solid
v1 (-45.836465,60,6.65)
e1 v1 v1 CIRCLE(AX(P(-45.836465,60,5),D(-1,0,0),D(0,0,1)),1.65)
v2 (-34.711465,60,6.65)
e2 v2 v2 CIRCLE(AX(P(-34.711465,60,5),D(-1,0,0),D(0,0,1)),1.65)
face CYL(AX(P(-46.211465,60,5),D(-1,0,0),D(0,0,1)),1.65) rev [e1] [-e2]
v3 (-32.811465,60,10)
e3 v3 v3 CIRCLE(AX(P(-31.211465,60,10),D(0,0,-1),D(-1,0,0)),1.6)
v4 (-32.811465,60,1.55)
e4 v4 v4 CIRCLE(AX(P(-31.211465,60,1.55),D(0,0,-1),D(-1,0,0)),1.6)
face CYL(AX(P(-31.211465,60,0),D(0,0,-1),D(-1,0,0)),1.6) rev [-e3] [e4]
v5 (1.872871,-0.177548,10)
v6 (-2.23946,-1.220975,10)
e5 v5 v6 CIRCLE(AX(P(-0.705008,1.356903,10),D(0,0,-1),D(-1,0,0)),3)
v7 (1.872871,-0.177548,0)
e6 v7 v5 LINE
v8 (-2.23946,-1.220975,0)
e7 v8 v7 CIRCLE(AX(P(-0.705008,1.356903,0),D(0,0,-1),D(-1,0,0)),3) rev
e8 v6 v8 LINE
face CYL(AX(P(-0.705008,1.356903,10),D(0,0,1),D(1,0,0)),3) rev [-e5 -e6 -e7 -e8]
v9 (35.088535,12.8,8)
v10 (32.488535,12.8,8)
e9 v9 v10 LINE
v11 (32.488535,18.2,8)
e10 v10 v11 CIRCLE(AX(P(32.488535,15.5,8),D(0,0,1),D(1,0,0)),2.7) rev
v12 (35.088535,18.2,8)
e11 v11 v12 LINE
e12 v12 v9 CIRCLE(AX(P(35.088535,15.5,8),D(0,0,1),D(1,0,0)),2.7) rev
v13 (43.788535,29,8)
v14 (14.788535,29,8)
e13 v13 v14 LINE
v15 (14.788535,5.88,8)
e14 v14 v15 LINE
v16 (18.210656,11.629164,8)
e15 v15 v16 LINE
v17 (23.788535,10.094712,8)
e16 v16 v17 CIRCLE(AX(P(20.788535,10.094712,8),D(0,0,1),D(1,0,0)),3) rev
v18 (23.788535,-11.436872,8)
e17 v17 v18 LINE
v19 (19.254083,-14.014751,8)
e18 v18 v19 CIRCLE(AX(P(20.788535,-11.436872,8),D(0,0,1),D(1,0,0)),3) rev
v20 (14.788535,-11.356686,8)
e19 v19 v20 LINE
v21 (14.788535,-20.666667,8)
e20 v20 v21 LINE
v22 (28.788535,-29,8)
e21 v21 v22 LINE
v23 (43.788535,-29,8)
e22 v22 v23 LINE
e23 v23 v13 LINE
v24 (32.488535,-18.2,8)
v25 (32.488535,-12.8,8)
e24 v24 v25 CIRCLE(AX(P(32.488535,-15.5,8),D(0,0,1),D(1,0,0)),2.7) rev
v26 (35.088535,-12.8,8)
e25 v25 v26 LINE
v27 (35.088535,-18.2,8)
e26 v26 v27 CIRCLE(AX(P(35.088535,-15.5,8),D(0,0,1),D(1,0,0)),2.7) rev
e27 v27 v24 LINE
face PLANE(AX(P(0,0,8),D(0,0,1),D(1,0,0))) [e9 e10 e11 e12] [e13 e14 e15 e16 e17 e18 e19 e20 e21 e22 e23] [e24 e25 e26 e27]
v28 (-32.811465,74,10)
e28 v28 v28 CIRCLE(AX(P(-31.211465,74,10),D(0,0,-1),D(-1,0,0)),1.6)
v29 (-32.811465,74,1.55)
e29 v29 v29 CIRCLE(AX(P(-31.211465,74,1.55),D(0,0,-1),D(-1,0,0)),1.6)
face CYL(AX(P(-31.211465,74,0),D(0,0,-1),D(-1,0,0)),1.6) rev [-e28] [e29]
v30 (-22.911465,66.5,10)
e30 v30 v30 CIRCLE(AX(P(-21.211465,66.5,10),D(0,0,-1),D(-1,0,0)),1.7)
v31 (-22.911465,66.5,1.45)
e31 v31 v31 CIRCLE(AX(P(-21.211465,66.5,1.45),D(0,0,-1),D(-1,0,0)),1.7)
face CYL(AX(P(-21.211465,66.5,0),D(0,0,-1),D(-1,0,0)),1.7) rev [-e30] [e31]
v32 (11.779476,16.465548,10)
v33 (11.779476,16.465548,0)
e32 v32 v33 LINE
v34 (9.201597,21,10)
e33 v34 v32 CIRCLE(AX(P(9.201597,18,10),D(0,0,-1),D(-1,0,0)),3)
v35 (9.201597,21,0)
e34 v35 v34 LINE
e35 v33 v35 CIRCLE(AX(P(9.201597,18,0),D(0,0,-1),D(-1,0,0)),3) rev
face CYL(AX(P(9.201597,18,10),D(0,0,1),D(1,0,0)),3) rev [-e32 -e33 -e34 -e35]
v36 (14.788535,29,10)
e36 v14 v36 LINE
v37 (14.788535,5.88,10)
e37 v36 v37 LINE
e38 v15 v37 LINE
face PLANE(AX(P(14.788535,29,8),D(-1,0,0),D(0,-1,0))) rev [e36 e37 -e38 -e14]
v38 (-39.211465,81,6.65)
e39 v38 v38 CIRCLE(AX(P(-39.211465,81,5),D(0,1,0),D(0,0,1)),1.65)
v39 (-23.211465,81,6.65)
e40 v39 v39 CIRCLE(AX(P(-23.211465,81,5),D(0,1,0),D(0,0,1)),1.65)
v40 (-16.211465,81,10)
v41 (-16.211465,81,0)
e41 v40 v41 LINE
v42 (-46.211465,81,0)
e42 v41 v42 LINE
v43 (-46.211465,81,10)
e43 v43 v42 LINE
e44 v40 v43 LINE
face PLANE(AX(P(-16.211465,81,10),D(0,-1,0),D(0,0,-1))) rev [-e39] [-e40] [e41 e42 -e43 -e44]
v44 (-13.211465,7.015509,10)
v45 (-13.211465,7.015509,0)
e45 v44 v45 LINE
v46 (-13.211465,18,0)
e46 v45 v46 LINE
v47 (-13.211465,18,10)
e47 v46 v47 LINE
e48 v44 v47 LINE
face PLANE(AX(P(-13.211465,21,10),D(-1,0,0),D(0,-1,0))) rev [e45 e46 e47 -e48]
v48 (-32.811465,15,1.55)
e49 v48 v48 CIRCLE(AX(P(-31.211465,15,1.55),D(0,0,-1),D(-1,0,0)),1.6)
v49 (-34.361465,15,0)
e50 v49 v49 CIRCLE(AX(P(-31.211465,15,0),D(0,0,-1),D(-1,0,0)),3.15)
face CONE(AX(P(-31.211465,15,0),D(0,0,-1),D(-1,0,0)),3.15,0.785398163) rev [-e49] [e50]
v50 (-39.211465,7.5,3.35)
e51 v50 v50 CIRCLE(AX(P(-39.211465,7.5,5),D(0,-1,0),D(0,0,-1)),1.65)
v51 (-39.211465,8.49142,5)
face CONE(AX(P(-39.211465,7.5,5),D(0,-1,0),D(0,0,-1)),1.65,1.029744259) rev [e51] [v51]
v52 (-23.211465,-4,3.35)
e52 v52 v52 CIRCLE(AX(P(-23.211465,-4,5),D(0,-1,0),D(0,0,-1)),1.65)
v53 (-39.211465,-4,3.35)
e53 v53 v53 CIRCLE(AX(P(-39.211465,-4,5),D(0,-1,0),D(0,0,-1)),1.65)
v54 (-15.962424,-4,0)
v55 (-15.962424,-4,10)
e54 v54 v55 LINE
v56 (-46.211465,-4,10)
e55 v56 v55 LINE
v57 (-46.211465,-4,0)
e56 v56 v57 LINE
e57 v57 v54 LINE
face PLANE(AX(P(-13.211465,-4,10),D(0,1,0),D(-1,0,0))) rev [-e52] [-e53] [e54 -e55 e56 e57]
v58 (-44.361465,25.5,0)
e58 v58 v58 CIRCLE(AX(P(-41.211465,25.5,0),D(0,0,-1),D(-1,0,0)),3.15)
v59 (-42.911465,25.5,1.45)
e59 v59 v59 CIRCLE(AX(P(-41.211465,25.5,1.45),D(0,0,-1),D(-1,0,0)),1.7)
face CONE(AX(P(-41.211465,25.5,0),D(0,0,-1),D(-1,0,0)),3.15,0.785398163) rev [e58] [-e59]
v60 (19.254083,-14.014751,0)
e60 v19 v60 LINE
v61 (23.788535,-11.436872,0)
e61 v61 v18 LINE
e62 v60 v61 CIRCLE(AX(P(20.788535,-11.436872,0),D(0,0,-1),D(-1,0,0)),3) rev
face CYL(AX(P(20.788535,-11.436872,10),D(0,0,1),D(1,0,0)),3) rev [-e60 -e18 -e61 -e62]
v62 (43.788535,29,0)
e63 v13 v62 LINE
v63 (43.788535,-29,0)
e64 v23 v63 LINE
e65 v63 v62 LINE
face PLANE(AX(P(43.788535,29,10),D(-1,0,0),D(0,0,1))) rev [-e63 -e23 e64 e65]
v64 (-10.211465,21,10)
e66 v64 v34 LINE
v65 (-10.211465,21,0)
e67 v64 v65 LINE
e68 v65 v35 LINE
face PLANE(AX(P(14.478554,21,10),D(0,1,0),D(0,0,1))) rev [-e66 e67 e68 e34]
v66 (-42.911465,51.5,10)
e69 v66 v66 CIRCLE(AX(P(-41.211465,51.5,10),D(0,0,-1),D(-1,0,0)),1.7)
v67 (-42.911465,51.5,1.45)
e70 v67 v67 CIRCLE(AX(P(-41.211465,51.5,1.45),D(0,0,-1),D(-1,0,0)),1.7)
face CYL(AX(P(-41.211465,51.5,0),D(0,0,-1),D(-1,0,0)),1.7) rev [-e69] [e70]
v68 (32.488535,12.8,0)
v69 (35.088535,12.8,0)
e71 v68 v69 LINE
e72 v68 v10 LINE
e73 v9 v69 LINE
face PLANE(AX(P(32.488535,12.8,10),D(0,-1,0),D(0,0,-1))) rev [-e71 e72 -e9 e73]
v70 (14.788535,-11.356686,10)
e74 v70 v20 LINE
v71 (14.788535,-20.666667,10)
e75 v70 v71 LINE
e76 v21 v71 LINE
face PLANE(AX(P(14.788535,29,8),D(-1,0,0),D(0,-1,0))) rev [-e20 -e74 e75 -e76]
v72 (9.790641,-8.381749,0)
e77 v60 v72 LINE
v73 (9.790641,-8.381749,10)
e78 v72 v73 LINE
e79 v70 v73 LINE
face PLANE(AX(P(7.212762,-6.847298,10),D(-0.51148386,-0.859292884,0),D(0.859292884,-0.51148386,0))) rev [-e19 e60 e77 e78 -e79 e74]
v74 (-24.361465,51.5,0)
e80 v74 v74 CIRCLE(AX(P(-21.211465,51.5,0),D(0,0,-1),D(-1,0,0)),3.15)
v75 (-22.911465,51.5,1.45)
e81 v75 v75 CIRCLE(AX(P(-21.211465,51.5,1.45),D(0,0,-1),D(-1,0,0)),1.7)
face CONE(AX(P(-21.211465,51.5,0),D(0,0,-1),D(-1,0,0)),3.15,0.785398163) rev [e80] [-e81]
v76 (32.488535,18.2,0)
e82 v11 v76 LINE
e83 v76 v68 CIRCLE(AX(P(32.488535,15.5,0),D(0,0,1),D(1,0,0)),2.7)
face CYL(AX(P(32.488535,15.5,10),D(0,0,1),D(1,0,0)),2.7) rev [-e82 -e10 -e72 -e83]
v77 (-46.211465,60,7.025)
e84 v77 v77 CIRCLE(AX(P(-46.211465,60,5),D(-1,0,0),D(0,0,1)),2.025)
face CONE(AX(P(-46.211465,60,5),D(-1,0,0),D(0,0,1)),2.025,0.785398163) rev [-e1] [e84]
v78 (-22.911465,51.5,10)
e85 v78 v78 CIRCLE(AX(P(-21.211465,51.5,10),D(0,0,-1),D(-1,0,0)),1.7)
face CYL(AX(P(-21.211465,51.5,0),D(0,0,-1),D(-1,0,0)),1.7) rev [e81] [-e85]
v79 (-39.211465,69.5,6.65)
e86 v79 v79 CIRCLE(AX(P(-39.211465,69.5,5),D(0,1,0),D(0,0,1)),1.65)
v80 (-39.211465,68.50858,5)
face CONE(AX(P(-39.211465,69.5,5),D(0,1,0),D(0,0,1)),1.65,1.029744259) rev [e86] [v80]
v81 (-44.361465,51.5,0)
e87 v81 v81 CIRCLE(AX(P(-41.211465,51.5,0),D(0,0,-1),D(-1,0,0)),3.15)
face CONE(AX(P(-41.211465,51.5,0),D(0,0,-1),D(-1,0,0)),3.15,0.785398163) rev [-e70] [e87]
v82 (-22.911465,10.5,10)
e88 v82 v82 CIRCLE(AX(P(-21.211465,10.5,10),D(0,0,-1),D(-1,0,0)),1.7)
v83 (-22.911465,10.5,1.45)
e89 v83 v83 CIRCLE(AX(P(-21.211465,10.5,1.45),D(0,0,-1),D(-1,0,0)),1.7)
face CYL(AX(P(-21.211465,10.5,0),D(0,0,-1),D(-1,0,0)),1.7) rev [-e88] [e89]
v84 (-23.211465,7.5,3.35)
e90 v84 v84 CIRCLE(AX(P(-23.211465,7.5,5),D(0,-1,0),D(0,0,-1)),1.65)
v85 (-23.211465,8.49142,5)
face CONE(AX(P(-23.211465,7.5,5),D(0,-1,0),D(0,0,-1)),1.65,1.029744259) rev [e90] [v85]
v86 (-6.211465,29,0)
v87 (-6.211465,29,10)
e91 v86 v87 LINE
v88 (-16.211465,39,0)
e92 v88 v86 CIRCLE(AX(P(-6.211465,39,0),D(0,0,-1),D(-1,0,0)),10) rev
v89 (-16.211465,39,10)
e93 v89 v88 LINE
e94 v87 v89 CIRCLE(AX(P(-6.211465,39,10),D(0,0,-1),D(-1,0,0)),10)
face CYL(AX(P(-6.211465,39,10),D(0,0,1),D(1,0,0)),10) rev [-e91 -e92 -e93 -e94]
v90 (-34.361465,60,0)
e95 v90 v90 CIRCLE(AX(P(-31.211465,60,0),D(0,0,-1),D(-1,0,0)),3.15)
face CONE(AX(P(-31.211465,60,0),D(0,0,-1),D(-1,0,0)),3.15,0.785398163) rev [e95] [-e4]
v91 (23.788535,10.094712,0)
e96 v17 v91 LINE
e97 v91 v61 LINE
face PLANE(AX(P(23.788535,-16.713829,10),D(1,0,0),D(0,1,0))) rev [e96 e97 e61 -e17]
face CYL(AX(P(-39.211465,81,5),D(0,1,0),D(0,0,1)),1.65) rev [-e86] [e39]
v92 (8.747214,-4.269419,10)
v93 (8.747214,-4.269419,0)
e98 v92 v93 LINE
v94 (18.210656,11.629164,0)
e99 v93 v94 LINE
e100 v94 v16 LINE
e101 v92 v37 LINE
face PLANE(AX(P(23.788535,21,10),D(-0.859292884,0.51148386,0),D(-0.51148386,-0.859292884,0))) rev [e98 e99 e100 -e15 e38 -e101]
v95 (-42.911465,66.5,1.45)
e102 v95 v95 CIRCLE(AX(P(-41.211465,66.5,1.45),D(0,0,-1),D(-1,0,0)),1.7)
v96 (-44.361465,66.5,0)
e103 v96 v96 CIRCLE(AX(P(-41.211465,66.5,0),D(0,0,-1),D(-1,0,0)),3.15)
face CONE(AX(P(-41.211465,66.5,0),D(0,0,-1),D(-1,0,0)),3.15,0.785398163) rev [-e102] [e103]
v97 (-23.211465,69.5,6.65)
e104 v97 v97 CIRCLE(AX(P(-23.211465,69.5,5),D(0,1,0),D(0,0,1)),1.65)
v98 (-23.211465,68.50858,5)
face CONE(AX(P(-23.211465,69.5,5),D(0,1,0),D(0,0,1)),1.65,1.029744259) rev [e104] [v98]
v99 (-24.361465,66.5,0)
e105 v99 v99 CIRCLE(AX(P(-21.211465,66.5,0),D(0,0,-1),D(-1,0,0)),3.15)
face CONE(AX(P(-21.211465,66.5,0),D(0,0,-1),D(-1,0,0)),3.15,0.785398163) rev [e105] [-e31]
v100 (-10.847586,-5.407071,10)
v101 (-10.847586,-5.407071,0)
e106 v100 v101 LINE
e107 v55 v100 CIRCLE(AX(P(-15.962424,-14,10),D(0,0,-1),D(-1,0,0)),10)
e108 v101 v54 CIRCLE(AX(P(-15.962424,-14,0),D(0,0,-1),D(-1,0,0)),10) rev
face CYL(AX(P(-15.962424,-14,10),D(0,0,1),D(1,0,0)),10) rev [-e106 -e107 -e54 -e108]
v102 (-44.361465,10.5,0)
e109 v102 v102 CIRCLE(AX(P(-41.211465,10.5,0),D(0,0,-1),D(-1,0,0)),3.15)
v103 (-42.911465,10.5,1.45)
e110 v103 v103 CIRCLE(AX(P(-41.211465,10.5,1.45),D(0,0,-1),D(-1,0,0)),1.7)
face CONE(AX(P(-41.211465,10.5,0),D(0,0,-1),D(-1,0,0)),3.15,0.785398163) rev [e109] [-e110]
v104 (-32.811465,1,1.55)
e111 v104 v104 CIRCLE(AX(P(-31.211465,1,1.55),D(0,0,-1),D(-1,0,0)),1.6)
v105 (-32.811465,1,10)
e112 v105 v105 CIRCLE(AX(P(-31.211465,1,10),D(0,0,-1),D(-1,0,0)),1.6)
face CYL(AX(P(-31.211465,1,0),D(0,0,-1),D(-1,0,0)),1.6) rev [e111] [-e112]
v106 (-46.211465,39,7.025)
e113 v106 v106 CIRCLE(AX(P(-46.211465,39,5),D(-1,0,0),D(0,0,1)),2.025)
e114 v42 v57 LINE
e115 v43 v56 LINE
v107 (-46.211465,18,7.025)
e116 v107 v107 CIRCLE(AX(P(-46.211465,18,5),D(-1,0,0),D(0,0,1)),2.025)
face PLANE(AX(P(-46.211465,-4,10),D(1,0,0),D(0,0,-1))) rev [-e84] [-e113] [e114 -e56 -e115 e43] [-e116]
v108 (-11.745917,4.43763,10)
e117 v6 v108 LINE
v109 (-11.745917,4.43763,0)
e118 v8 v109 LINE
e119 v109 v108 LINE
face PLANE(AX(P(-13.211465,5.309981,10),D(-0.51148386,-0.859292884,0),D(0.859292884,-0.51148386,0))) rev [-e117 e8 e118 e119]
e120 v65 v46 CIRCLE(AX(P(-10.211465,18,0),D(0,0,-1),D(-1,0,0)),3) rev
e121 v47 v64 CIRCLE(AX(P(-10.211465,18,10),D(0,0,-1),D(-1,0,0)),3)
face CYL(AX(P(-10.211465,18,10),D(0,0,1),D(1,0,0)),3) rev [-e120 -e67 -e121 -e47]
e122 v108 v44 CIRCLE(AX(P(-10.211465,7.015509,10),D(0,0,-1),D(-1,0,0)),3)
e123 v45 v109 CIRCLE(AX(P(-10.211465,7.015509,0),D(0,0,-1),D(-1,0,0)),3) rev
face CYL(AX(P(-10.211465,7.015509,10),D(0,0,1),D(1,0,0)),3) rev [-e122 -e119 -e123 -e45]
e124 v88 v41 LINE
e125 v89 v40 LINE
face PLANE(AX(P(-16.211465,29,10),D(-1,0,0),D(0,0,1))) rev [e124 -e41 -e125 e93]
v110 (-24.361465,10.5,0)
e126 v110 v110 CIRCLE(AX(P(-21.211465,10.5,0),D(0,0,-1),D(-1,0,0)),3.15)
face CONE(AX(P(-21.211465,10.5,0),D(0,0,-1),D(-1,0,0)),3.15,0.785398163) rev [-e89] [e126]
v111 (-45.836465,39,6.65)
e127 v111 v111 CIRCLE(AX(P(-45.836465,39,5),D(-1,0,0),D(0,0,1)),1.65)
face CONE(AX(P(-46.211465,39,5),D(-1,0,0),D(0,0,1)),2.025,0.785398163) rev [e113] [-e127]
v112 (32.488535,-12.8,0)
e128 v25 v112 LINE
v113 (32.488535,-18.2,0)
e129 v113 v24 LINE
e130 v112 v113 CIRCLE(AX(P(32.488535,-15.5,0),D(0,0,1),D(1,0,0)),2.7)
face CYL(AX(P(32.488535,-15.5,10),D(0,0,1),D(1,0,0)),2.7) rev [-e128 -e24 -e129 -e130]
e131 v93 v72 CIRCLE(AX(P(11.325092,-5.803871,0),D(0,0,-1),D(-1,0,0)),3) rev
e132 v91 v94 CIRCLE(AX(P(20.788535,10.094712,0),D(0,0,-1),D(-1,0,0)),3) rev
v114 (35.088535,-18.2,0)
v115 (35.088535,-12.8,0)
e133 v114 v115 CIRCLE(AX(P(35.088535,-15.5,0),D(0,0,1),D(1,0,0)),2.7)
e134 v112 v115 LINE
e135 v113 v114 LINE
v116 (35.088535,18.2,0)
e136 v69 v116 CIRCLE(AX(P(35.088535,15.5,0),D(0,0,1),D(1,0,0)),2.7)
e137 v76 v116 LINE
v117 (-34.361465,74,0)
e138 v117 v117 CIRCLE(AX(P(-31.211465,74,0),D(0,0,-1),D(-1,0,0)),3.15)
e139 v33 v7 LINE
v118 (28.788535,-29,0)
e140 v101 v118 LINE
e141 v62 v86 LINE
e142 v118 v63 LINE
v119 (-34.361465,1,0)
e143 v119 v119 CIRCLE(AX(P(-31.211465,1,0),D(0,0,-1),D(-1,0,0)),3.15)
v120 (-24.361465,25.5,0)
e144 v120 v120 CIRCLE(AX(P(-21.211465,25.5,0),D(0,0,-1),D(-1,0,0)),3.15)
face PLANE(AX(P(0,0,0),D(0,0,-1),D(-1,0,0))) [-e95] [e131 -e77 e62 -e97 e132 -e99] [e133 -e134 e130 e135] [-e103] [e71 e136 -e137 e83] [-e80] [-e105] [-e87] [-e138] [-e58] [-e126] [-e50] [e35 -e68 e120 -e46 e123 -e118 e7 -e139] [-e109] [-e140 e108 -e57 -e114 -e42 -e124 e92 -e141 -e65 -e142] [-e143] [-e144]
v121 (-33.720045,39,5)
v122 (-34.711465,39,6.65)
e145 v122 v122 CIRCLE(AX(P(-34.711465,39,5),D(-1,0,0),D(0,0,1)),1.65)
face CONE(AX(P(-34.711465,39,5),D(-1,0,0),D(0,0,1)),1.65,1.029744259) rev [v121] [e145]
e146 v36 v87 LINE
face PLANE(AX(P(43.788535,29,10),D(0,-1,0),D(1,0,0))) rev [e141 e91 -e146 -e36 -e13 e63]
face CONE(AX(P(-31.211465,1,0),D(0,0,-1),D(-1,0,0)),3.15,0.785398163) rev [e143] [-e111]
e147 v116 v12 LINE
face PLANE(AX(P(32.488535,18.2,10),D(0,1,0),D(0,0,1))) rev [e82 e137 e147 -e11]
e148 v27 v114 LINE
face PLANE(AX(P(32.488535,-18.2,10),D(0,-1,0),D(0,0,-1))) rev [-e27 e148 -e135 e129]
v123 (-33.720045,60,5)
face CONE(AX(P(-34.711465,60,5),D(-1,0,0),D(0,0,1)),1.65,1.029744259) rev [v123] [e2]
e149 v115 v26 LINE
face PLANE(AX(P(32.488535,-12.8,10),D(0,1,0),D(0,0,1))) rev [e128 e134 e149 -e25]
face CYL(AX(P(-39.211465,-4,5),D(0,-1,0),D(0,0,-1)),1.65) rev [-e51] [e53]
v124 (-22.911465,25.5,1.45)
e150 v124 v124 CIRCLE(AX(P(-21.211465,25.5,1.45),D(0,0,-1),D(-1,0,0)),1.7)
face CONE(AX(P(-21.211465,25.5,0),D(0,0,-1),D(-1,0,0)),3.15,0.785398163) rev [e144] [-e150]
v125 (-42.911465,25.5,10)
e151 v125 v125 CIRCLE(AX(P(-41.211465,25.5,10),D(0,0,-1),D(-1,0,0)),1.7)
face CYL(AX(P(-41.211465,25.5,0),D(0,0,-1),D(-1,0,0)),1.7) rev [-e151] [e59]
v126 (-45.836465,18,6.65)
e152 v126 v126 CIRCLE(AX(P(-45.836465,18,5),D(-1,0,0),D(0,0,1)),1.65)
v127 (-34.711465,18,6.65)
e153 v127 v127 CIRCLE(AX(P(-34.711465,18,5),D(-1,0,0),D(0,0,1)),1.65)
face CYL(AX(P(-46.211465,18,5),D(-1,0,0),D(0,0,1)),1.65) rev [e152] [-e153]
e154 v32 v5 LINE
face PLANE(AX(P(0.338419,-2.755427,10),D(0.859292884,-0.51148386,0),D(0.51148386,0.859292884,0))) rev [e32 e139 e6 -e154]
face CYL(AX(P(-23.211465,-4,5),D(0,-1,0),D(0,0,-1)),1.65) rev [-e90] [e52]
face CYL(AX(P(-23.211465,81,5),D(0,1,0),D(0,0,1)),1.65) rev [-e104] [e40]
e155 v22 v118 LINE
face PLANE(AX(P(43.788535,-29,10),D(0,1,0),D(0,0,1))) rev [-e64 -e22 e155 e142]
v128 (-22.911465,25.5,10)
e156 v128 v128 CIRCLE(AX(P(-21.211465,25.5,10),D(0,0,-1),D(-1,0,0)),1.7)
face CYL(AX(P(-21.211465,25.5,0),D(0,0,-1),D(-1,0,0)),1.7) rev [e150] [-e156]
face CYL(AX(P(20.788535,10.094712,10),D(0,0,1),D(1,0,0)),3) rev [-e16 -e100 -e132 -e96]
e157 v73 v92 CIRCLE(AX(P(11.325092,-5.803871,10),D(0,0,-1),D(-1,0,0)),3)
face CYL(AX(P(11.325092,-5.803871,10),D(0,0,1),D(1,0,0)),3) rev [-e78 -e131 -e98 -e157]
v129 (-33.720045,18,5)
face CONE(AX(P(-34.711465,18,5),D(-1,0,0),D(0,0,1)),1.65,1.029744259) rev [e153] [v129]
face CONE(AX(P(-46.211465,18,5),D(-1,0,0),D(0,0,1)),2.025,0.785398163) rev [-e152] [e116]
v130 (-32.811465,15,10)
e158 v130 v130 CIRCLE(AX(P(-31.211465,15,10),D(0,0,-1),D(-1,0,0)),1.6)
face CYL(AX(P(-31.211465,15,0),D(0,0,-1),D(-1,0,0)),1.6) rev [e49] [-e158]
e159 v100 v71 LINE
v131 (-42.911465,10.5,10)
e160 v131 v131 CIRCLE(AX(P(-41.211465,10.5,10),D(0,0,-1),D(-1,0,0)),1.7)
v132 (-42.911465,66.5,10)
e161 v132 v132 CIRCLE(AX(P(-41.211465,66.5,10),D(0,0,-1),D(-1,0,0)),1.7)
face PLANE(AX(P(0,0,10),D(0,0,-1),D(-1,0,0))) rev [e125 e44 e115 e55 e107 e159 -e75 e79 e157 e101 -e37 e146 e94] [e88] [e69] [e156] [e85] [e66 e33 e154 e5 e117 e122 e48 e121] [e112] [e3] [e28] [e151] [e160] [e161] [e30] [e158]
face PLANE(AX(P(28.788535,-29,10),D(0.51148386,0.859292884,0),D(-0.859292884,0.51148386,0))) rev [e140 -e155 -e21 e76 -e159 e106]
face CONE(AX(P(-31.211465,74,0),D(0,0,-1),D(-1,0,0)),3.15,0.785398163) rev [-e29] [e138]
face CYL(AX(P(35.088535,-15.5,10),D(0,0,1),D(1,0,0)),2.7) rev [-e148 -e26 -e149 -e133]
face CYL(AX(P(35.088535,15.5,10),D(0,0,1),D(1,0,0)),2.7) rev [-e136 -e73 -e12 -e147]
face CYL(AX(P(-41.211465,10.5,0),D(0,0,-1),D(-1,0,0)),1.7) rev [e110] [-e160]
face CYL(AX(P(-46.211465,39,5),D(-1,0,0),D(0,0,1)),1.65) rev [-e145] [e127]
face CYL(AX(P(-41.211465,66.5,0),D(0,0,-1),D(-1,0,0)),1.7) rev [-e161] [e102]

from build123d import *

# Parameters (mm, degrees)
AUFSATZ_LINEAR_AUSTRAGEN1_DEPTH                      = 10
F_5_4_5_4_DURCHMESSER_LANGLOCH4_DEPTH                = 10
SCHNITT_LINEAR_AUSTRAGEN1_DEPTH                      = 94.789655764
VERRUNDUNG1_R                                        = 3
M4_GEWINDEBOHRUNG2_D                                 = 3.3
M4_GEWINDEBOHRUNG2_DEPTH                             = 11.5
M4_GEWINDEBOHRUNG2_TIP                               = 0.991420021
FORMSENKUNG_F_R_M3_SENKSCHRAUBE_MIT_SCHL_D           = 3.2
FORMSENKUNG_F_R_M3_SENKSCHRAUBE_MIT_SCHL_CSINK_D     = 6.3
FORMSENKUNG_F_R_M3_SENKSCHRAUBE_MIT_SCHL_CSINK_ANGLE = 90
M4_GEWINDEBOHRUNG1_D                                 = 3.3
M4_GEWINDEBOHRUNG1_DEPTH                             = 11.5
M4_GEWINDEBOHRUNG1_TIP                               = 0.991420021
VERRUNDUNG2_R                                        = 10
SKIZZE13_W                                           = 29
SKIZZE13_H                                           = 58
SCHNITT_LINEAR_AUSTRAGEN2_DEPTH                      = 2
FORMSENKUNG_F_R_M3_LINSENSENKSCHRAUBE_MI_D           = 3.4
FORMSENKUNG_F_R_M3_LINSENSENKSCHRAUBE_MI_CSINK_D     = 6.3
FORMSENKUNG_F_R_M3_LINSENSENKSCHRAUBE_MI_CSINK_ANGLE = 90
M4_GEWINDEBOHRUNG3_D                                 = 3.3
M4_GEWINDEBOHRUNG3_DEPTH                             = 11.5
M4_GEWINDEBOHRUNG3_CSINK_D                           = 4.05
M4_GEWINDEBOHRUNG3_CSINK_ANGLE                       = 90
M4_GEWINDEBOHRUNG3_TIP                               = 0.991420021


# Read off the part's stored shape, not the designer's step: Ø5.4 (5.4) Durchmesser Langloch4
with BuildPart() as part:
    # Skizze1 → Aufsatz-Linear austragen1 (new body)
    with BuildSketch(Plane.XY):
        Polygon((28.788534666, -29), (-13.211465334, -4), (-46.211465334, -4), (-46.211465334, 81), (-16.211465334, 81), (-16.211465334, 29), (43.788534666, 29), (43.788534666, -29), align=None)
    extrude(amount=AUFSATZ_LINEAR_AUSTRAGEN1_DEPTH)

    # Ø5.4 (5.4) Durchmesser Langloch4 outline → Ø5.4 (5.4) Durchmesser Langloch4 (cut)
    with BuildSketch(Plane.XY):
        with BuildLine():
            Line((32.488534666, -18.2), (35.088534666, -18.2))
            ThreePointArc((35.088534666, -18.2), (37.788534666, -15.5), (35.088534666, -12.8))
            Line((35.088534666, -12.8), (32.488534666, -12.8))
            ThreePointArc((32.488534666, -12.8), (29.788534666, -15.5), (32.488534666, -18.2))
        make_face()
        with BuildLine():
            Line((32.488534666, 12.8), (35.088534666, 12.8))
            ThreePointArc((35.088534666, 12.8), (37.788534666, 15.5), (35.088534666, 18.2))
            Line((35.088534666, 18.2), (32.488534666, 18.2))
            ThreePointArc((32.488534666, 18.2), (29.788534666, 15.5), (32.488534666, 12.8))
        make_face()
    extrude(amount=F_5_4_5_4_DURCHMESSER_LANGLOCH4_DEPTH, mode=Mode.SUBTRACT)

    # Skizze5 → Schnitt-Linear austragen1 (cut, through all)
    with BuildSketch(Plane(origin=(0, 0, 0), x_dir=(-1, 0, 0), z_dir=(0, 0, -1))):
        Polygon((-23.788534666, -16.713829021), (-23.788534666, 21), (-7.212762179, -6.847297779), align=None)
        Polygon((13.211465334, 21), (13.211465334, 5.309980503), (-0.338419104, -2.7554269), (-14.478554163, 21), align=None)
    extrude(amount=-SCHNITT_LINEAR_AUSTRAGEN1_DEPTH, mode=Mode.SUBTRACT)

    # Verrundung1
    verrundung1_edges = [part.edges().sort_by_distance(p)[0] for p in [
        (7.212762179, -6.847297779, 5),
        (23.788534666, -16.713829021, 5),
        (23.788534666, 21, 5),
        (0.338419104, -2.7554269, 5),
        (14.478554163, 21, 5),
        (-13.211465334, 21, 5),
        (-13.211465334, 5.309980503, 5),
    ]]
    fillet(verrundung1_edges, radius=VERRUNDUNG1_R)

    # M4 Gewindebohrung2
    with Locations(Plane(origin=(0, -4, 0), x_dir=(-1, 0, 0), z_dir=(0, -1, 0))):
        with Locations((23.211465334, -5), (39.211465334, -5)):
            Hole(M4_GEWINDEBOHRUNG2_D / 2, depth=M4_GEWINDEBOHRUNG2_DEPTH)
            with Locations((0, 0, -(M4_GEWINDEBOHRUNG2_DEPTH + M4_GEWINDEBOHRUNG2_TIP / 2))):  # 118° drill point
                Cone(0, M4_GEWINDEBOHRUNG2_D / 2, M4_GEWINDEBOHRUNG2_TIP, mode=Mode.SUBTRACT)

    # Formsenkung für M3 Senkschraube mit Schlitz/Kreuzschlitz1 (through all)
    with Locations(Plane(origin=(0, 0, 0), x_dir=(1, 0, 0), z_dir=(0, 0, -1))):
        with Locations((-31.211465334, -15), (-31.211465334, -1), (-31.211465334, -74), (-31.211465334, -60)):
            CounterSinkHole(FORMSENKUNG_F_R_M3_SENKSCHRAUBE_MIT_SCHL_D / 2, FORMSENKUNG_F_R_M3_SENKSCHRAUBE_MIT_SCHL_CSINK_D / 2, counter_sink_angle=FORMSENKUNG_F_R_M3_SENKSCHRAUBE_MIT_SCHL_CSINK_ANGLE)

    # M4 Gewindebohrung1
    with Locations(Plane(origin=(0, 81, 0), x_dir=(1, 0, 0), z_dir=(0, 1, 0))):
        with Locations((-39.211465334, -5), (-23.211465334, -5)):
            Hole(M4_GEWINDEBOHRUNG1_D / 2, depth=M4_GEWINDEBOHRUNG1_DEPTH)
            with Locations((0, 0, -(M4_GEWINDEBOHRUNG1_DEPTH + M4_GEWINDEBOHRUNG1_TIP / 2))):  # 118° drill point
                Cone(0, M4_GEWINDEBOHRUNG1_D / 2, M4_GEWINDEBOHRUNG1_TIP, mode=Mode.SUBTRACT)

    # Verrundung2
    verrundung2_edges = [part.edges().sort_by_distance(p)[0] for p in [
        (-13.211465334, -4, 5),
        (-16.211465334, 29, 5),
    ]]
    fillet(verrundung2_edges, radius=VERRUNDUNG2_R)

    # Skizze13 → Schnitt-Linear austragen2 (cut)
    with BuildSketch(Plane.XY.offset(10)):
        with Locations((29.288534666, 0)):
            Rectangle(SKIZZE13_W, SKIZZE13_H)
    extrude(amount=-SCHNITT_LINEAR_AUSTRAGEN2_DEPTH, mode=Mode.SUBTRACT)

    # Formsenkung für M3 Linsensenkschraube mit Schlitz1 (through all)
    with Locations(Plane(origin=(0, 0, 0), x_dir=(-1, 0, 0), z_dir=(0, 0, -1))):
        with Locations((21.211465334, 66.5), (21.211465334, 51.5), (41.211465334, 66.5), (41.211465334, 51.5), (21.211465334, 25.5), (21.211465334, 10.5), (41.211465334, 25.5), (41.211465334, 10.5)):
            CounterSinkHole(FORMSENKUNG_F_R_M3_LINSENSENKSCHRAUBE_MI_D / 2, FORMSENKUNG_F_R_M3_LINSENSENKSCHRAUBE_MI_CSINK_D / 2, counter_sink_angle=FORMSENKUNG_F_R_M3_LINSENSENKSCHRAUBE_MI_CSINK_ANGLE)

    # M4 Gewindebohrung3
    with Locations(Plane.ZY.offset(46.211465334)):
        with Locations((5, 39), (5, 18), (5, 60)):
            CounterSinkHole(M4_GEWINDEBOHRUNG3_D / 2, M4_GEWINDEBOHRUNG3_CSINK_D / 2, depth=M4_GEWINDEBOHRUNG3_DEPTH, counter_sink_angle=M4_GEWINDEBOHRUNG3_CSINK_ANGLE)
            with Locations((0, 0, -(M4_GEWINDEBOHRUNG3_DEPTH + M4_GEWINDEBOHRUNG3_TIP / 2))):  # 118° drill point
                Cone(0, M4_GEWINDEBOHRUNG3_D / 2, M4_GEWINDEBOHRUNG3_TIP, mode=Mode.SUBTRACT)


solid = part.part
